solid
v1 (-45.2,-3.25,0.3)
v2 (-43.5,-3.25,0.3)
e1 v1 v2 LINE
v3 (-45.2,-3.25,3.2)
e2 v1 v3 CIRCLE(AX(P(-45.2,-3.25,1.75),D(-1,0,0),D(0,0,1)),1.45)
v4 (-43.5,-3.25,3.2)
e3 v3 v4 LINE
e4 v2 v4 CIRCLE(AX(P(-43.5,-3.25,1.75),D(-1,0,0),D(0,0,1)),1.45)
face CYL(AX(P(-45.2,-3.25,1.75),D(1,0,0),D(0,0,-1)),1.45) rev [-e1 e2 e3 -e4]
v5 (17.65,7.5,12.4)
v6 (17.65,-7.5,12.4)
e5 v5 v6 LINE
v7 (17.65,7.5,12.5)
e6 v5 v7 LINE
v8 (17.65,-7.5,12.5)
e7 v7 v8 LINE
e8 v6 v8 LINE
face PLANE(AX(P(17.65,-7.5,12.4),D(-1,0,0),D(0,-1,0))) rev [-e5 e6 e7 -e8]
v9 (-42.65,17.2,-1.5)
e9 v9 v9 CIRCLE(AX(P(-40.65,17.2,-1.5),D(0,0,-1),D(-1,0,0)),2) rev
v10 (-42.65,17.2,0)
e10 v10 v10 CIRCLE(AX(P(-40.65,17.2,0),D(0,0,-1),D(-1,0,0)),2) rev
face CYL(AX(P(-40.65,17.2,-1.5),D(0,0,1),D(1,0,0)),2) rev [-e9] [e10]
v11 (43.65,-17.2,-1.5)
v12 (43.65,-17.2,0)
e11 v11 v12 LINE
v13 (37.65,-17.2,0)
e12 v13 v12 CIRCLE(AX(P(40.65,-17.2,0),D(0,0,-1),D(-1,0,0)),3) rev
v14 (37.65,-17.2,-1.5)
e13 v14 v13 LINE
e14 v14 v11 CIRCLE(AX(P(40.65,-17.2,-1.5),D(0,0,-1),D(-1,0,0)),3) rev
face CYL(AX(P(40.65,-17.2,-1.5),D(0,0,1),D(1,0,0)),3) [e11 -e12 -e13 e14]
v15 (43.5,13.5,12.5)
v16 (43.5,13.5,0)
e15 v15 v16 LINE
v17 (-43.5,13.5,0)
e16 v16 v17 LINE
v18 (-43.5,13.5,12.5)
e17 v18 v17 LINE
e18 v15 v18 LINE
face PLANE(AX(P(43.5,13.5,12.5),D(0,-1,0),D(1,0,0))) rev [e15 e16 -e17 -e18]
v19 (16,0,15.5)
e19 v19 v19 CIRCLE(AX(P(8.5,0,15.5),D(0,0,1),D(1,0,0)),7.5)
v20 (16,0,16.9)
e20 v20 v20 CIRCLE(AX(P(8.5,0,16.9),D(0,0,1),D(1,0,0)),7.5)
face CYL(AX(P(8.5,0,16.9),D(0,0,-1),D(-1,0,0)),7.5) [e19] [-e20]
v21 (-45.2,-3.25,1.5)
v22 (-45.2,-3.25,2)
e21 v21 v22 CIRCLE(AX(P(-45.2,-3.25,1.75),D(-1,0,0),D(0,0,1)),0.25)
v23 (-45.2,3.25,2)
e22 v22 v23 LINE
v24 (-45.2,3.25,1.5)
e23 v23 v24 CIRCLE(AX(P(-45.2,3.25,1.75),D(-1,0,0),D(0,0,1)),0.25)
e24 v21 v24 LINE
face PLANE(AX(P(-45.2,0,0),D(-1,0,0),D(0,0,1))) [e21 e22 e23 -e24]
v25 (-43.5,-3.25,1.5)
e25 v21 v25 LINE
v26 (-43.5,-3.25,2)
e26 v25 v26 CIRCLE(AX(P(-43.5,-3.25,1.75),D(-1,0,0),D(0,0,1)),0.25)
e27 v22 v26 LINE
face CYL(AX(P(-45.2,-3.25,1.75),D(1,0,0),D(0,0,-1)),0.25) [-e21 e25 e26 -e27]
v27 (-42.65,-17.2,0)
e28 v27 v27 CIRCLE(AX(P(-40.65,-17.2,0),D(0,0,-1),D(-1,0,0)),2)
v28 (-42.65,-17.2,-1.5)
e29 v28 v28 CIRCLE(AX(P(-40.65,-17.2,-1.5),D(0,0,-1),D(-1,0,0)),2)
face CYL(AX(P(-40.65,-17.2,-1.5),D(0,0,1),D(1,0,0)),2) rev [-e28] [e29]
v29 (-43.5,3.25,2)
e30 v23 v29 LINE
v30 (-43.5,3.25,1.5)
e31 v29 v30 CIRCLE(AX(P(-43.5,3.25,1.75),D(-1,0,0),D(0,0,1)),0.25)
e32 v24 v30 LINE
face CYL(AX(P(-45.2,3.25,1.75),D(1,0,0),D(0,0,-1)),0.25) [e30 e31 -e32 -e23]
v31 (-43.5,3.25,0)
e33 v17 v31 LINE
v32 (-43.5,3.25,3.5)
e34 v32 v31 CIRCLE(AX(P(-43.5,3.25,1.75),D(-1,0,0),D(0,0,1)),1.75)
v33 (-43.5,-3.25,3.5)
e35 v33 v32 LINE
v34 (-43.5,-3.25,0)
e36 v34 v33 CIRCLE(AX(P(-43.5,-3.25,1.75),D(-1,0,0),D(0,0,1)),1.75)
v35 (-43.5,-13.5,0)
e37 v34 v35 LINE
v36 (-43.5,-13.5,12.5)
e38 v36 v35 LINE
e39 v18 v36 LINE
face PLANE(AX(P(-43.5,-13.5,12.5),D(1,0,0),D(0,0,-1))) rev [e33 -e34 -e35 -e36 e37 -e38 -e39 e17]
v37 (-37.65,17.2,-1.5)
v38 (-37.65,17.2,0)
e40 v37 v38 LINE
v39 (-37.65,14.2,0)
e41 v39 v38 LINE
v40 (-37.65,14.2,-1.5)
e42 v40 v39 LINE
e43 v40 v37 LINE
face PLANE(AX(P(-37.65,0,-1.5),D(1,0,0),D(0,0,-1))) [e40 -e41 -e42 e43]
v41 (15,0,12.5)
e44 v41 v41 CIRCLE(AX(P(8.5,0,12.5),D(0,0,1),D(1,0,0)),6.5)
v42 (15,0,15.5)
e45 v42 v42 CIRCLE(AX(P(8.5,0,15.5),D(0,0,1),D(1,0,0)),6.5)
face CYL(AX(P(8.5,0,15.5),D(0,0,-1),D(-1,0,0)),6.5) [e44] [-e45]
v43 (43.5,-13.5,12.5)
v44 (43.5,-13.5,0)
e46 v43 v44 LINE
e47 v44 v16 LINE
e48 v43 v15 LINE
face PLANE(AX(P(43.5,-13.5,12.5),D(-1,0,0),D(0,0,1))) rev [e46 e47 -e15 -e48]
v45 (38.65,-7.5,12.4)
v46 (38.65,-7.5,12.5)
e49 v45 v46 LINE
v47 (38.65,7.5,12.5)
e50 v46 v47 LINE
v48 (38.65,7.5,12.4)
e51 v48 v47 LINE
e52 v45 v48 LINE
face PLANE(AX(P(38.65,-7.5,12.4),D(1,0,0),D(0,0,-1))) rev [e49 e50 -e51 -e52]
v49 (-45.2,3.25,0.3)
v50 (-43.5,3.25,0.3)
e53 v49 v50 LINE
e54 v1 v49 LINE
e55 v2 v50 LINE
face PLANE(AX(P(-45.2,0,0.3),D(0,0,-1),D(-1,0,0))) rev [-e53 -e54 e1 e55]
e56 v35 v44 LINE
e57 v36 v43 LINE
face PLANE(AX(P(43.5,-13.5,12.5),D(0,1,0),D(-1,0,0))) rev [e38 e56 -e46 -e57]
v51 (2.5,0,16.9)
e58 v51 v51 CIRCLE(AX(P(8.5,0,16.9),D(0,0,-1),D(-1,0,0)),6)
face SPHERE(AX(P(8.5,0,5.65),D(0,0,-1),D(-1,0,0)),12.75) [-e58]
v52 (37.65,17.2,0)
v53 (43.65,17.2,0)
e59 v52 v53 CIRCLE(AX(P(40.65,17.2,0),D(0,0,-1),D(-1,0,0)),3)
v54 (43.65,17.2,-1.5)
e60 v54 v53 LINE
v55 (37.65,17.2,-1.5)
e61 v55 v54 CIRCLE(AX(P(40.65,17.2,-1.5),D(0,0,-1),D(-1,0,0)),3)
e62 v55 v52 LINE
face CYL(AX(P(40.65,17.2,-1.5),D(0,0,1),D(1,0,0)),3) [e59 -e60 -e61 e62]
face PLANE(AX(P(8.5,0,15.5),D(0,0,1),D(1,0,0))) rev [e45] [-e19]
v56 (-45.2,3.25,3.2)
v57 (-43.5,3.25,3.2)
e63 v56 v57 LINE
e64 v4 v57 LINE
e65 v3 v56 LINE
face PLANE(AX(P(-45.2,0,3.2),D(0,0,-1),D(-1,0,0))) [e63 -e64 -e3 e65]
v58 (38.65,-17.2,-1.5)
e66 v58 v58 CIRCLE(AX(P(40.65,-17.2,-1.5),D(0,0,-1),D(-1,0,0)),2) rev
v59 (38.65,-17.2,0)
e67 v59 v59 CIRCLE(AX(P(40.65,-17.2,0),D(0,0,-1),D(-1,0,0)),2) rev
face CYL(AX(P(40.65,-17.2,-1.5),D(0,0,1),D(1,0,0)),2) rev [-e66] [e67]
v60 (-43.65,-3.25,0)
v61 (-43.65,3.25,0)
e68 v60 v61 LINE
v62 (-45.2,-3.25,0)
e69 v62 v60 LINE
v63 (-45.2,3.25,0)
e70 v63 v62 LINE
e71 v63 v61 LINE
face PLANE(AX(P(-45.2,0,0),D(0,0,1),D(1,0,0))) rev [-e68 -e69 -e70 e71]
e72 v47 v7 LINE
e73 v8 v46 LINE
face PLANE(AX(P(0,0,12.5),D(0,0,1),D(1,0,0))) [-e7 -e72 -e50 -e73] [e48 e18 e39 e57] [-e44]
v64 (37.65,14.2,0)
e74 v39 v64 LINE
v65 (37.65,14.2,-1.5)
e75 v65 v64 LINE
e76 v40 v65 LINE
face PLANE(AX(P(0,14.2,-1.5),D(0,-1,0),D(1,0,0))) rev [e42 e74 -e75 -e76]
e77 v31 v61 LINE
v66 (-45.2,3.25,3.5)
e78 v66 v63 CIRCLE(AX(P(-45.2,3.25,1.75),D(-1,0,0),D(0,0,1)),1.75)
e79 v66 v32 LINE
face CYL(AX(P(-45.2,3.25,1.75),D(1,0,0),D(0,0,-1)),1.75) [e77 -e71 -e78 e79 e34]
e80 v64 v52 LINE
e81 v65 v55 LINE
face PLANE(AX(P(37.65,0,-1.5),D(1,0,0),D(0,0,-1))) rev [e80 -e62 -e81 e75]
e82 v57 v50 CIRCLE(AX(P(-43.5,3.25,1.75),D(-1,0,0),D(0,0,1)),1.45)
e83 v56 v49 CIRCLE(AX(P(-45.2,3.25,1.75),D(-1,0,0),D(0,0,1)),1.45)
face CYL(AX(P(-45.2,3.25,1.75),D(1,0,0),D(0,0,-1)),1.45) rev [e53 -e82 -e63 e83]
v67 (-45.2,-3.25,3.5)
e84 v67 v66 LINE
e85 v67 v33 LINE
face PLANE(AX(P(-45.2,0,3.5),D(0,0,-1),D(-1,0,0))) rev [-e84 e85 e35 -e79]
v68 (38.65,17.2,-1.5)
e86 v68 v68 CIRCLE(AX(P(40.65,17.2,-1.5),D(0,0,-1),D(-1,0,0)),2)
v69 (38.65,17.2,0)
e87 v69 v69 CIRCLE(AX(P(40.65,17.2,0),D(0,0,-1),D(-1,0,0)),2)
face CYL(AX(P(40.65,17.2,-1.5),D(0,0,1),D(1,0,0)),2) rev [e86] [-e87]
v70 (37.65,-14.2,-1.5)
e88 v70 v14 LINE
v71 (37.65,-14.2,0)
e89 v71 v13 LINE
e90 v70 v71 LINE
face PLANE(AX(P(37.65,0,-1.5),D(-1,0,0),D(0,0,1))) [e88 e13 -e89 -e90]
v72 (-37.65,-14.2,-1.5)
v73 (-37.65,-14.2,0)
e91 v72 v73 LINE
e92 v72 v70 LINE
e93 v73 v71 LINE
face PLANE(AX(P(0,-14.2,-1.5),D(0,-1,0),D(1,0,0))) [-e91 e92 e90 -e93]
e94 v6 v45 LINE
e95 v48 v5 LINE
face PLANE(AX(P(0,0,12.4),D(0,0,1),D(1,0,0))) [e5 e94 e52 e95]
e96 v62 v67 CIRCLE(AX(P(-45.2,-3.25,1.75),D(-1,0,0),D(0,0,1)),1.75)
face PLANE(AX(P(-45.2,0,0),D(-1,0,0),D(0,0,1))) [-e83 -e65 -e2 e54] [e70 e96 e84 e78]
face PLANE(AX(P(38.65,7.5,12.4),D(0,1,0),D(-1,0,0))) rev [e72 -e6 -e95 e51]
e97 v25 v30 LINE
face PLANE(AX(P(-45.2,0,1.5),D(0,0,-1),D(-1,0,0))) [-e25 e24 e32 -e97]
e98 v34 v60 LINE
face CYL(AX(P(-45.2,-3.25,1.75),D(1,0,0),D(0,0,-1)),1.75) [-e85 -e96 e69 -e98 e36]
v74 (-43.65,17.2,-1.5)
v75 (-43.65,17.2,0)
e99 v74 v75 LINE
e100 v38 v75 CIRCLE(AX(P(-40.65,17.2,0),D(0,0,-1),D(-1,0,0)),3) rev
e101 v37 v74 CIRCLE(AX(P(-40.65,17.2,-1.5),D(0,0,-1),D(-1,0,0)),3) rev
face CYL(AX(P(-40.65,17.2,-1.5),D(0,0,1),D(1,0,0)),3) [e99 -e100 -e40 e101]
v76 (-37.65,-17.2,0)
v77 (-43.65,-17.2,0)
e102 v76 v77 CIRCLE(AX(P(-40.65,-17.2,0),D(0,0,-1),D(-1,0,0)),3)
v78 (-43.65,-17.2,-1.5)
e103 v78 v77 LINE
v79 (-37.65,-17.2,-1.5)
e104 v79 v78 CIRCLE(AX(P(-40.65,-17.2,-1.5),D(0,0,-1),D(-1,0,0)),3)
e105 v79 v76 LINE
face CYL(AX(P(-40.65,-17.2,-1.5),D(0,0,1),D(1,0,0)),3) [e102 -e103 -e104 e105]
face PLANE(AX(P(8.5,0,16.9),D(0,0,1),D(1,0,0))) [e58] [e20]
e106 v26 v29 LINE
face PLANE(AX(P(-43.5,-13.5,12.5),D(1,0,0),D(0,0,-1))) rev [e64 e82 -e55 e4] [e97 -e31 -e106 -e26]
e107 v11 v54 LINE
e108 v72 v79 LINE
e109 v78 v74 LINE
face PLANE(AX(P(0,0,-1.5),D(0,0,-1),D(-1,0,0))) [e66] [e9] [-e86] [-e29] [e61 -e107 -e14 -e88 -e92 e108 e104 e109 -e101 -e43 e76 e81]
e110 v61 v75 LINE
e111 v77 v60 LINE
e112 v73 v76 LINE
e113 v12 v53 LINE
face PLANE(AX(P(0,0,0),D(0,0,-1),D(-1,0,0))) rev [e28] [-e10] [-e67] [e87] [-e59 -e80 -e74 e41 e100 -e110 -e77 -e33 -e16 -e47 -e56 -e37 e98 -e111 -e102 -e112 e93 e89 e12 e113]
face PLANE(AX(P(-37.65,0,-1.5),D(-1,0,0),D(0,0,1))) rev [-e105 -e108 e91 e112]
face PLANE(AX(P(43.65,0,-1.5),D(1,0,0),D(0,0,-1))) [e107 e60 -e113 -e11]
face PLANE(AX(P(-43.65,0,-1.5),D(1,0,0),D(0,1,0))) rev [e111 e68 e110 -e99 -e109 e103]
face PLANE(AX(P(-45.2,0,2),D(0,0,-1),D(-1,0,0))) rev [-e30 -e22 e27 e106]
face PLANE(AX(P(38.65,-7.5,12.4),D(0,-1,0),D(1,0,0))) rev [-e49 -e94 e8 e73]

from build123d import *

# Parameters (mm, degrees)
CROQUIS1_W              = 87
CROQUIS1_H              = 27
SALIENTE_EXTRUIR1_DEPTH = 12.5
CROQUIS2_R              = 2
SALIENTE_EXTRUIR3_DEPTH = 1.5
CROQUIS3_R              = 6.5
SALIENTE_EXTRUIR4_DEPTH = 3
CROQUIS4_R              = 7.5
SALIENTE_EXTRUIR5_DEPTH = 1.4
CROQUIS8_W              = 21
CROQUIS8_H              = 15
CORTAR_EXTRUIR2_DEPTH   = 0.1
SALIENTE_EXTRUIR6_DEPTH = 1.7


with BuildPart() as part:
    # Croquis1 → Saliente-Extruir1 (new body)
    with BuildSketch(Plane.XY):
        Rectangle(CROQUIS1_W, CROQUIS1_H)
    extrude(amount=SALIENTE_EXTRUIR1_DEPTH)

    # Croquis2 → Saliente-Extruir3 (add)
    with BuildSketch(Plane(origin=(0, 0, 0), x_dir=(-1, 0, 0), z_dir=(0, 0, -1))):
        with BuildLine():
            Line((43.65, -17.2), (43.65, 17.2))
            ThreePointArc((43.65, 17.2), (40.65, 20.2), (37.65, 17.2))
            Line((37.65, 17.2), (37.65, 14.2))
            Line((37.65, 14.2), (-37.65, 14.2))
            Line((-37.65, 14.2), (-37.65, 17.2))
            ThreePointArc((-37.65, 17.2), (-40.65, 20.2), (-43.65, 17.2))
            Line((-43.65, 17.2), (-43.65, -17.2))
            ThreePointArc((-43.65, -17.2), (-40.65, -20.2), (-37.65, -17.2))
            Line((-37.65, -17.2), (-37.65, -14.2))
            Line((-37.65, -14.2), (37.65, -14.2))
            Line((37.65, -14.2), (37.65, -17.2))
            ThreePointArc((37.65, -17.2), (40.65, -20.2), (43.65, -17.2))
        make_face()
        with Locations((40.65, -17.2)):
            Circle(CROQUIS2_R, mode=Mode.SUBTRACT)
        with Locations((-40.65, -17.2)):
            Circle(CROQUIS2_R, mode=Mode.SUBTRACT)
        with Locations((-40.65, 17.2)):
            Circle(CROQUIS2_R, mode=Mode.SUBTRACT)
        with Locations((40.65, 17.2)):
            Circle(CROQUIS2_R, mode=Mode.SUBTRACT)
    extrude(amount=SALIENTE_EXTRUIR3_DEPTH)

    # Croquis3 → Saliente-Extruir4 (add)
    with BuildSketch(Plane.XY.offset(12.5)):
        with Locations((8.5, 0)):
            Circle(CROQUIS3_R)
    extrude(amount=SALIENTE_EXTRUIR4_DEPTH)

    # Croquis4 → Saliente-Extruir5 (add)
    with BuildSketch(Plane.XY.offset(15.5)):
        with Locations((8.5, 0)):
            Circle(CROQUIS4_R)
    extrude(amount=SALIENTE_EXTRUIR5_DEPTH)

    # Croquis7 → Revolución3 (revolve)
    with BuildSketch(Plane(origin=(0, 0, 0), x_dir=(1, 0, 0), z_dir=(0, 1, 0))):
        with BuildLine():
            Line((14.5, -16.9), (8.5, -16.9))
            Line((8.5, -16.9), (8.5, -18.4))
            ThreePointArc((8.5, -18.4), (11.592329219, -18.019316877), (14.5, -16.9))
        make_face()
    revolve(axis=Axis((8.5, 0, 16.9), (0, 0, 1)))

    # Croquis8 → Cortar-Extruir2 (cut)
    with BuildSketch(Plane.XY.offset(12.5)):
        with Locations((28.15, 0)):
            Rectangle(CROQUIS8_W, CROQUIS8_H)
    extrude(amount=-CORTAR_EXTRUIR2_DEPTH, mode=Mode.SUBTRACT)

    # Croquis9 → Saliente-Extruir6 (add)
    # profile 1 of 2: a face of its own
    with BuildSketch(Plane.ZY.offset(43.5)):
        with BuildLine():
            Line((0, 3.25), (0, -3.25))
            ThreePointArc((0, -3.25), (1.75, -5), (3.5, -3.25))
            Line((3.5, -3.25), (3.5, 3.25))
            ThreePointArc((3.5, 3.25), (1.75, 5), (0, 3.25))
        make_face()
        with BuildLine():
            ThreePointArc((3.2, -3.25), (1.75, -4.7), (0.3, -3.25))
            Line((0.3, -3.25), (0.3, 3.25))
            ThreePointArc((0.3, 3.25), (1.75, 4.7), (3.2, 3.25))
            Line((3.2, 3.25), (3.2, -3.25))
        make_face(mode=Mode.SUBTRACT)
    # profile 2 of 2: a face of its own
    with BuildSketch(Plane.ZY.offset(43.5)):
        with BuildLine():
            Line((1.5, 3.25), (1.5, -3.25))
            ThreePointArc((1.5, -3.25), (1.75, -3.5), (2, -3.25))
            Line((2, -3.25), (2, 3.25))
            ThreePointArc((2, 3.25), (1.75, 3.5), (1.5, 3.25))
        make_face()
    extrude(amount=SALIENTE_EXTRUIR6_DEPTH)


solid = part.part
